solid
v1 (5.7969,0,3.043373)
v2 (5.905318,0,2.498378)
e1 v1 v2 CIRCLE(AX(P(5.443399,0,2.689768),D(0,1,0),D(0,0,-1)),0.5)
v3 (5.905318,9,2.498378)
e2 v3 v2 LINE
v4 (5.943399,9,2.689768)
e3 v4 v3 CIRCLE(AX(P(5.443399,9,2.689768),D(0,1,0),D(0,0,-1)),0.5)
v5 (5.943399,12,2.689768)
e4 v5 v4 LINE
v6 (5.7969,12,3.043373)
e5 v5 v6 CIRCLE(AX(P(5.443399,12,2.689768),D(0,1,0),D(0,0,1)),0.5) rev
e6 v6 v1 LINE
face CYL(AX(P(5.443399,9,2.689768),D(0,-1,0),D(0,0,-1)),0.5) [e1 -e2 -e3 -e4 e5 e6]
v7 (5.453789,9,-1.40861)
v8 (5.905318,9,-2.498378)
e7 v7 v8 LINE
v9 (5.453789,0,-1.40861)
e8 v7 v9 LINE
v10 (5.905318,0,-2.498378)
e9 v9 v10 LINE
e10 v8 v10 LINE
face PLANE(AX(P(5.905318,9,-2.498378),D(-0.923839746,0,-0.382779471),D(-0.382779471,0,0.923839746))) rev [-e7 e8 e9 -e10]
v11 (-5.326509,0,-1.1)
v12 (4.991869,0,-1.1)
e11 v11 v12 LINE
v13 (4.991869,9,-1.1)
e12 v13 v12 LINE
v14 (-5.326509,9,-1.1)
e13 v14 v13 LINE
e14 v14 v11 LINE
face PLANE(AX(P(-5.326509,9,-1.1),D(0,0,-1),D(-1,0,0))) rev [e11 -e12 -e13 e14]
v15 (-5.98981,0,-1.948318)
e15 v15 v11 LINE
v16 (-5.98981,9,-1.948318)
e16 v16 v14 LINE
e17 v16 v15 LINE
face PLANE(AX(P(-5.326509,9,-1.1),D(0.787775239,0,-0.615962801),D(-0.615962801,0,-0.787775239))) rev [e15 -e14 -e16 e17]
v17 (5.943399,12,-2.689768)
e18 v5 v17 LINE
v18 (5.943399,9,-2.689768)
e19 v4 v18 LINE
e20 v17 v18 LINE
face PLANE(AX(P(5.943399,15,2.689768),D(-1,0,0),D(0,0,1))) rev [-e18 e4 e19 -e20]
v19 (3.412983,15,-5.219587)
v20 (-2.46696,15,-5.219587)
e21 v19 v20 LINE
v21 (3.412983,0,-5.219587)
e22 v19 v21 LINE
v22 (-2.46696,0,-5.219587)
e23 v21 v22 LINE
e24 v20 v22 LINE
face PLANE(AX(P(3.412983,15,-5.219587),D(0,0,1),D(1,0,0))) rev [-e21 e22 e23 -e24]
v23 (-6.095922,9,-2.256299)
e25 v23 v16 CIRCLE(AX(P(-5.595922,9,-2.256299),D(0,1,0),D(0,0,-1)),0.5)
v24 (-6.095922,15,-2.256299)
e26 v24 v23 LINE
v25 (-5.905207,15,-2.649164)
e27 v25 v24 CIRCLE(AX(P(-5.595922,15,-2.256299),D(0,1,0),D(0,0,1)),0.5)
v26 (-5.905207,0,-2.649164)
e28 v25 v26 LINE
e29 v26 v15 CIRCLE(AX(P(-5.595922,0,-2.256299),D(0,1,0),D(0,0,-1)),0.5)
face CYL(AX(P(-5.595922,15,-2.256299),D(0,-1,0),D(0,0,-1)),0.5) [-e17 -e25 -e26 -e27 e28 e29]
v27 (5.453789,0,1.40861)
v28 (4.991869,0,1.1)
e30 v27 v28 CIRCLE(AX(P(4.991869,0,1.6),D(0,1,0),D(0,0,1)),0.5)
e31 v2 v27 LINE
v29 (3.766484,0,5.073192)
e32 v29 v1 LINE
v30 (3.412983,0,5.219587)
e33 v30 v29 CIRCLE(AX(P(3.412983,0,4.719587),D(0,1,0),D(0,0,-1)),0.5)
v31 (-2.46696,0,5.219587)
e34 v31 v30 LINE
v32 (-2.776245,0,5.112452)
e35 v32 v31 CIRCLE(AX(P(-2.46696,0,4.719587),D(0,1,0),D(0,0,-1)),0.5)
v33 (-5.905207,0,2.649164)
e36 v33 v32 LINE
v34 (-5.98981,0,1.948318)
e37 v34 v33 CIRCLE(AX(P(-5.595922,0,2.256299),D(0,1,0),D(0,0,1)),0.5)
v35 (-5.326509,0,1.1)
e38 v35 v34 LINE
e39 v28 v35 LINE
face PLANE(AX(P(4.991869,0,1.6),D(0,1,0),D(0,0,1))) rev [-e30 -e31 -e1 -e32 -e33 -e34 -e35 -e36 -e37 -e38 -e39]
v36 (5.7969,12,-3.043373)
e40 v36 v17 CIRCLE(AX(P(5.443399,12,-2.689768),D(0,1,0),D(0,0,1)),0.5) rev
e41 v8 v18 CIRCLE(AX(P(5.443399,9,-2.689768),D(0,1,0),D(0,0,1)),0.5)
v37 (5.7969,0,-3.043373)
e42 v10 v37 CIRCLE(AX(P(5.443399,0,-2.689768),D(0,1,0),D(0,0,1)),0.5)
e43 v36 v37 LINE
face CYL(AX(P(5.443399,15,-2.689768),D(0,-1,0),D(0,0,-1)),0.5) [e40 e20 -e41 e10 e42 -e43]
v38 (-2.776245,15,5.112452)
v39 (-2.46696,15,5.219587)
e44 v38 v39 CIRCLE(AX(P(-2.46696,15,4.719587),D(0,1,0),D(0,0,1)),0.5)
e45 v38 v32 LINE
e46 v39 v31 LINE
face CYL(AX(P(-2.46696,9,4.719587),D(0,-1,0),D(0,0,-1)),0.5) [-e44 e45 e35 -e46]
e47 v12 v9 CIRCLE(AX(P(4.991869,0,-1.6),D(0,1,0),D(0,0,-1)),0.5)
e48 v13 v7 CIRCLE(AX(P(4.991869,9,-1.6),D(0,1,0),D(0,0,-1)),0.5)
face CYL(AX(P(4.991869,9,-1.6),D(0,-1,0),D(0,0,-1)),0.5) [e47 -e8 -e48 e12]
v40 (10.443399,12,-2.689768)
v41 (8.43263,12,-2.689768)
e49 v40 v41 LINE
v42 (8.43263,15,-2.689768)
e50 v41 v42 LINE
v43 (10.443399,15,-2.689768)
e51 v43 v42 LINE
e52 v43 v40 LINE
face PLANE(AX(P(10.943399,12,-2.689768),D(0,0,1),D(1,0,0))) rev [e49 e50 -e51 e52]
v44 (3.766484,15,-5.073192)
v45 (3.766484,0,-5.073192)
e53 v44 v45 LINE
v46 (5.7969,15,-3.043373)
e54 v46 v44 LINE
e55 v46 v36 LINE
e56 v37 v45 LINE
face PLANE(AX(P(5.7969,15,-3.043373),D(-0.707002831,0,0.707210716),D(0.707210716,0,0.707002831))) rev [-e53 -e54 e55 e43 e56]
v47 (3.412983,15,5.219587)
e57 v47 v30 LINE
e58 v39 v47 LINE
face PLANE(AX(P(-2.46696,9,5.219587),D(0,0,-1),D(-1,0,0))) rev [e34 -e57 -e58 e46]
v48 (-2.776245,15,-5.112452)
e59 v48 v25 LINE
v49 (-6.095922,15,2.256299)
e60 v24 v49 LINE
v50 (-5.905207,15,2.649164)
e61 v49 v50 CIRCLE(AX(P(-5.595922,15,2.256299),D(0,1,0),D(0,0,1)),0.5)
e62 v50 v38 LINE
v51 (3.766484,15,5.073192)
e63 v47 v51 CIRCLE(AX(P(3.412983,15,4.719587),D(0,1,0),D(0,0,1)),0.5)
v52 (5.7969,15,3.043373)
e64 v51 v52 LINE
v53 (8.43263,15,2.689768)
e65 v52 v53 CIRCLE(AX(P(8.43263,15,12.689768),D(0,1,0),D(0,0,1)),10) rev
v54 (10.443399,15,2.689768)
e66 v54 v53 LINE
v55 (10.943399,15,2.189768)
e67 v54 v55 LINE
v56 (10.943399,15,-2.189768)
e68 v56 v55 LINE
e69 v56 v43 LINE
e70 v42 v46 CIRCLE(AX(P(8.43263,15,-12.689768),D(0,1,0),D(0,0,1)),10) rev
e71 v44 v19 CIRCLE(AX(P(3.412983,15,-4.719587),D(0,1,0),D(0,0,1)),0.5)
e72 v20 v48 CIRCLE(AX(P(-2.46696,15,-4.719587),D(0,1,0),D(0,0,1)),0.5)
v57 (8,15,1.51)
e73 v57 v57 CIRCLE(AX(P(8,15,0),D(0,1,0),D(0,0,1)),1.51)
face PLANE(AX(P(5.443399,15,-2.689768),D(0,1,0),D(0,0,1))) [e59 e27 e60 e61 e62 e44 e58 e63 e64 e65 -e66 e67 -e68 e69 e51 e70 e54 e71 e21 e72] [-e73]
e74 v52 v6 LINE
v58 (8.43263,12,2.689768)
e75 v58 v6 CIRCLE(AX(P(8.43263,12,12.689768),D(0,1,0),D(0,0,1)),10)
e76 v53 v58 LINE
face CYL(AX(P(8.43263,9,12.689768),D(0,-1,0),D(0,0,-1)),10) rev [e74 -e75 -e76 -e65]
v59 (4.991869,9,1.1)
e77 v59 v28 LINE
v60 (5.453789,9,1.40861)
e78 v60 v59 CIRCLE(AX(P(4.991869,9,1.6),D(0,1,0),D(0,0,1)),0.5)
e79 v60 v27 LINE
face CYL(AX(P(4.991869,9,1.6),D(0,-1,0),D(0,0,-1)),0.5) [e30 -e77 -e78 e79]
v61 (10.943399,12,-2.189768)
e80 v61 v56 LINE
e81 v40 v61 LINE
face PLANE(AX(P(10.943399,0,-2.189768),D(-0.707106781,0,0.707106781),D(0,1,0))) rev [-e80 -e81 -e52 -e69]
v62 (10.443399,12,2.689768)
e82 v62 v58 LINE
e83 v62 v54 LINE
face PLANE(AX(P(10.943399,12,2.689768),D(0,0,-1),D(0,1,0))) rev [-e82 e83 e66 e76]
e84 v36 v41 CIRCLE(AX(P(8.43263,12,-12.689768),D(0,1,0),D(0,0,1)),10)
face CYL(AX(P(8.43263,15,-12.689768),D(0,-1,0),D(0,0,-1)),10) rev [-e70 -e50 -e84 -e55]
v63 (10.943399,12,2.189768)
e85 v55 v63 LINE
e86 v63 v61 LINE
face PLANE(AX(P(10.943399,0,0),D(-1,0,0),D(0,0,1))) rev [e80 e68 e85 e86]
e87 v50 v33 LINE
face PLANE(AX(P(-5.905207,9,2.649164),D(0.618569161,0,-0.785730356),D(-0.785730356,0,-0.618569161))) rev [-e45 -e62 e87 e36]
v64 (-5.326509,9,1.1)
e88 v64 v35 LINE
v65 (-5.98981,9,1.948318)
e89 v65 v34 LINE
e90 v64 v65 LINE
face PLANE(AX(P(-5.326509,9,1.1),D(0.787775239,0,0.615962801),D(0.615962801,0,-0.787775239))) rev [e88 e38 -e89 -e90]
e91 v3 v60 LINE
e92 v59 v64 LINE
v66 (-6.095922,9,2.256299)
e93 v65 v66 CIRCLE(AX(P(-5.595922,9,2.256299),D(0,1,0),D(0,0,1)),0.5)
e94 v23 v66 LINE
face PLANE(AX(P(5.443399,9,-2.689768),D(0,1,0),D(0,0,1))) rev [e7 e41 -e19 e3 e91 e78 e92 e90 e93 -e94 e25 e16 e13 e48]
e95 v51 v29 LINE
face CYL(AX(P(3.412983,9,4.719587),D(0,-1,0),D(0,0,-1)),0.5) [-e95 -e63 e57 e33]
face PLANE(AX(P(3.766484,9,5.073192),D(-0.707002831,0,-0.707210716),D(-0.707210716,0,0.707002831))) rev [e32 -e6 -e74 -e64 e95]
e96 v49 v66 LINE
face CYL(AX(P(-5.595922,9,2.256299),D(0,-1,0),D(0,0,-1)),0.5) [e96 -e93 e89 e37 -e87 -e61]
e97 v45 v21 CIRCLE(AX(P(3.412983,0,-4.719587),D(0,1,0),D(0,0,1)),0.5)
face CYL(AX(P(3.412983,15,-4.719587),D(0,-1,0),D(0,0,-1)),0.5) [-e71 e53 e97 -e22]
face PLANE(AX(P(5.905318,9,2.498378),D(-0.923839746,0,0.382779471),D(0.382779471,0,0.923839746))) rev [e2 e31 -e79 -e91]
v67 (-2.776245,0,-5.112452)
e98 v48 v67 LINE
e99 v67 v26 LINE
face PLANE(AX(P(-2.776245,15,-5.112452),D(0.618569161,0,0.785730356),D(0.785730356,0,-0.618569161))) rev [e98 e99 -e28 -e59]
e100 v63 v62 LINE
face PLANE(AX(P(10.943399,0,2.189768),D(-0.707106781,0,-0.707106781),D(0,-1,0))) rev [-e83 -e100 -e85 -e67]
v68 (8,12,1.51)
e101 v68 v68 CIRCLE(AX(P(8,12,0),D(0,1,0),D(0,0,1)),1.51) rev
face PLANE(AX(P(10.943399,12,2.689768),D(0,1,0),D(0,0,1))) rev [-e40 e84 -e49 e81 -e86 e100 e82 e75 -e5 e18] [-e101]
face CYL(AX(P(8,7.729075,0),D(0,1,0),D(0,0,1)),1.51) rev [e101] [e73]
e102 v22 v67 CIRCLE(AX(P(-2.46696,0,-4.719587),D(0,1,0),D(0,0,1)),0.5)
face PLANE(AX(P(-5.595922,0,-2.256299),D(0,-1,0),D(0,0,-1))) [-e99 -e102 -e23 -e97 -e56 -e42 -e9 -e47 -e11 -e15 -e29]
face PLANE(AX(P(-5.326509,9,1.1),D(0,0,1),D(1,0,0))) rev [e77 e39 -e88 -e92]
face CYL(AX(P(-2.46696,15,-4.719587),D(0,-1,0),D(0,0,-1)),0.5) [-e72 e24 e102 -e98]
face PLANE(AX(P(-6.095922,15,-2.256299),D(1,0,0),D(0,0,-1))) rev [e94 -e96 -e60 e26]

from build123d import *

# Parameters (mm, degrees)
EXTRUDE_1_DEPTH     = 9
EXTRUDE_1_2_DEPTH   = 9
EXTRUDE_2_DEPTH     = 6
SKETCH_7_W          = 5.379535364
SKETCH_7_H          = 3
EXTRUDE_3_DEPTH     = 5
FILLET_1_R          = 10
CHAMFER_1_SIZE      = 0.5
SKETCH_8_R          = 1.51
CUT_EXTRUDE_1_DEPTH = 3


with BuildPart() as part:
    # 草图4 → 凸台-拉伸1 (new body)
    with BuildSketch(Plane(origin=(0, 0, 0), x_dir=(1, 0, 0), z_dir=(0, 1, 0))):
        with BuildLine():
            Line((-5.326508943, 1.1), (4.991869226, 1.1))
            ThreePointArc((4.991869226, 1.1), (5.269632733, 1.184250756), (5.453789099, 1.408610265))
            Line((5.453789099, 1.408610265), (5.90531838, 2.498377946))
            ThreePointArc((5.90531838, 2.498377946), (5.933789047, 2.787323397), (5.796899922, 3.04337304))
            Line((5.796899922, 3.04337304), (3.766484258, 5.073191861))
            ThreePointArc((3.766484258, 5.073191861), (3.604290607, 5.181540331), (3.412982843, 5.219586503))
            Line((3.412982843, 5.219586503), (-2.466960198, 5.219586503))
            ThreePointArc((-2.466960198, 5.219586503), (-2.630617478, 5.19204422), (-2.776244778, 5.112451681))
            Line((-2.776244778, 5.112451681), (-5.905207067, 2.649164418))
            ThreePointArc((-5.905207067, 2.649164418), (-6.092318767, 2.31622196), (-5.989810106, 1.948317839))
            Line((-5.989810106, 1.948317839), (-5.326508943, 1.1))
        make_face()
    extrude(amount=EXTRUDE_1_DEPTH)



with BuildPart() as body_2:
    # 草图4 → Extrude 1 2 (new body)
    with BuildSketch(Plane(origin=(0, 0, 0), x_dir=(1, 0, 0), z_dir=(0, 1, 0))):
        with BuildLine():
            Line((3.766484258, -5.073191861), (5.796899922, -3.04337304))
            ThreePointArc((5.796899922, -3.04337304), (5.933789047, -2.787323397), (5.90531838, -2.498377946))
            Line((5.90531838, -2.498377946), (5.453789099, -1.408610265))
            ThreePointArc((5.453789099, -1.408610265), (5.269632733, -1.184250756), (4.991869226, -1.1))
            Line((4.991869226, -1.1), (-5.326508943, -1.1))
            Line((-5.326508943, -1.1), (-5.989810106, -1.948317839))
            ThreePointArc((-5.989810106, -1.948317839), (-6.092318767, -2.31622196), (-5.905207067, -2.649164418))
            Line((-5.905207067, -2.649164418), (-2.776244778, -5.112451681))
            ThreePointArc((-2.776244778, -5.112451681), (-2.630617478, -5.19204422), (-2.466960198, -5.219586503))
            Line((-2.466960198, -5.219586503), (3.412982843, -5.219586503))
            ThreePointArc((3.412982843, -5.219586503), (3.604290607, -5.181540331), (3.766484258, -5.073191861))
        make_face()
    extrude(amount=EXTRUDE_1_2_DEPTH)


with BuildPart() as part_1:
    add(part.part)

    add(body_2.part)  # 凸台-拉伸2 merges body 2
    # 草图5 → 凸台-拉伸2 (add)
    with BuildSketch(Plane(origin=(0, 9, 0), x_dir=(1, 0, 0), z_dir=(0, 1, 0))):
        with BuildLine():
            Line((3.766484258, -5.073191861), (5.796899922, -3.04337304))
            ThreePointArc((5.796899922, -3.04337304), (5.905324208, -2.881143349), (5.943398507, -2.689767682))
            Line((5.943398507, -2.689767682), (5.943398507, 2.689767682))
            ThreePointArc((5.943398507, 2.689767682), (5.905324208, 2.881143349), (5.796899922, 3.04337304))
            Line((5.796899922, 3.04337304), (3.766484258, 5.073191861))
            ThreePointArc((3.766484258, 5.073191861), (3.604290607, 5.181540331), (3.412982843, 5.219586503))
            Line((3.412982843, 5.219586503), (-2.466960198, 5.219586503))
            ThreePointArc((-2.466960198, 5.219586503), (-2.630617478, 5.19204422), (-2.776244778, 5.112451681))
            Line((-2.776244778, 5.112451681), (-5.905207067, 2.649164418))
            ThreePointArc((-5.905207067, 2.649164418), (-6.045723715, 2.474654122), (-6.095922486, 2.256299239))
            Line((-6.095922486, 2.256299239), (-6.095922486, -2.256299239))
            ThreePointArc((-6.095922486, -2.256299239), (-6.045723715, -2.474654122), (-5.905207067, -2.649164418))
            Line((-5.905207067, -2.649164418), (-2.776244778, -5.112451681))
            ThreePointArc((-2.776244778, -5.112451681), (-2.630617478, -5.19204422), (-2.466960198, -5.219586503))
            Line((-2.466960198, -5.219586503), (3.412982843, -5.219586503))
            ThreePointArc((3.412982843, -5.219586503), (3.604290607, -5.181540331), (3.766484258, -5.073191861))
        make_face()
    extrude(amount=EXTRUDE_2_DEPTH)

    # 草图7 → 凸台-拉伸3 (add)
    with BuildSketch(Plane(origin=(5.943398507, 0, 0), x_dir=(0, 0, -1), z_dir=(1, 0, 0))):
        with Locations((0, 13.5)):
            Rectangle(SKETCH_7_W, SKETCH_7_H)
    extrude(amount=EXTRUDE_3_DEPTH)

    # 圆角1
    # the kernel refuses this fillet: 10 mm, written as the material it adds along each edge
    with BuildSketch(Plane(origin=(5.943398507, 12, -2.689767682), x_dir=(-0.38275133514604787, 0, -0.923851403334929), z_dir=(0, 1, 0))) as fillet_1_piece_1:
        with BuildLine():
            CenterArc((8.285757547, -6.127192899), FILLET_1_R, 142.213613886, 15.282174956)
            Line((-0.952756487, -2.299679547), (0, 0))
            ThreePointArc((0, 0), (0.191375668, -0.038074298), (0.382751335, 0))
        make_face()
    extrude(amount=3)
    with BuildSketch(Plane(origin=(5.943398507, 12, 2.689767682), x_dir=(-0.3827513351460759, 0, 0.9238514033349174), z_dir=(0, 1, 0))) as fillet_1_piece_2:
        with BuildLine():
            CenterArc((8.285757547, 6.127192899), FILLET_1_R, 202.504211157, 15.282174956)
            Line((-0.952756487, 2.299679547), (0, 0))
            ThreePointArc((0, 0), (0.191375668, 0.038074298), (0.382751335, 0))
        make_face()
    extrude(amount=3)

    # 倒角1
    chamfer_1_edges = [part_1.edges().sort_by_distance(p)[0] for p in [
        (10.943398507, 13.5, -2.689767682),
        (10.943398507, 13.5, 2.689767682),
    ]]
    chamfer(chamfer_1_edges, length=CHAMFER_1_SIZE)

    # 草图8 → 切除-拉伸1 (cut)
    with BuildSketch(Plane(origin=(0, 15, 0), x_dir=(1, 0, 0), z_dir=(0, 1, 0))):
        with Locations(Location((8, 0, 0), (0, 0, 270))):
            Circle(SKETCH_8_R)
    extrude(amount=-CUT_EXTRUDE_1_DEPTH, mode=Mode.SUBTRACT)


solid = part_1.part
